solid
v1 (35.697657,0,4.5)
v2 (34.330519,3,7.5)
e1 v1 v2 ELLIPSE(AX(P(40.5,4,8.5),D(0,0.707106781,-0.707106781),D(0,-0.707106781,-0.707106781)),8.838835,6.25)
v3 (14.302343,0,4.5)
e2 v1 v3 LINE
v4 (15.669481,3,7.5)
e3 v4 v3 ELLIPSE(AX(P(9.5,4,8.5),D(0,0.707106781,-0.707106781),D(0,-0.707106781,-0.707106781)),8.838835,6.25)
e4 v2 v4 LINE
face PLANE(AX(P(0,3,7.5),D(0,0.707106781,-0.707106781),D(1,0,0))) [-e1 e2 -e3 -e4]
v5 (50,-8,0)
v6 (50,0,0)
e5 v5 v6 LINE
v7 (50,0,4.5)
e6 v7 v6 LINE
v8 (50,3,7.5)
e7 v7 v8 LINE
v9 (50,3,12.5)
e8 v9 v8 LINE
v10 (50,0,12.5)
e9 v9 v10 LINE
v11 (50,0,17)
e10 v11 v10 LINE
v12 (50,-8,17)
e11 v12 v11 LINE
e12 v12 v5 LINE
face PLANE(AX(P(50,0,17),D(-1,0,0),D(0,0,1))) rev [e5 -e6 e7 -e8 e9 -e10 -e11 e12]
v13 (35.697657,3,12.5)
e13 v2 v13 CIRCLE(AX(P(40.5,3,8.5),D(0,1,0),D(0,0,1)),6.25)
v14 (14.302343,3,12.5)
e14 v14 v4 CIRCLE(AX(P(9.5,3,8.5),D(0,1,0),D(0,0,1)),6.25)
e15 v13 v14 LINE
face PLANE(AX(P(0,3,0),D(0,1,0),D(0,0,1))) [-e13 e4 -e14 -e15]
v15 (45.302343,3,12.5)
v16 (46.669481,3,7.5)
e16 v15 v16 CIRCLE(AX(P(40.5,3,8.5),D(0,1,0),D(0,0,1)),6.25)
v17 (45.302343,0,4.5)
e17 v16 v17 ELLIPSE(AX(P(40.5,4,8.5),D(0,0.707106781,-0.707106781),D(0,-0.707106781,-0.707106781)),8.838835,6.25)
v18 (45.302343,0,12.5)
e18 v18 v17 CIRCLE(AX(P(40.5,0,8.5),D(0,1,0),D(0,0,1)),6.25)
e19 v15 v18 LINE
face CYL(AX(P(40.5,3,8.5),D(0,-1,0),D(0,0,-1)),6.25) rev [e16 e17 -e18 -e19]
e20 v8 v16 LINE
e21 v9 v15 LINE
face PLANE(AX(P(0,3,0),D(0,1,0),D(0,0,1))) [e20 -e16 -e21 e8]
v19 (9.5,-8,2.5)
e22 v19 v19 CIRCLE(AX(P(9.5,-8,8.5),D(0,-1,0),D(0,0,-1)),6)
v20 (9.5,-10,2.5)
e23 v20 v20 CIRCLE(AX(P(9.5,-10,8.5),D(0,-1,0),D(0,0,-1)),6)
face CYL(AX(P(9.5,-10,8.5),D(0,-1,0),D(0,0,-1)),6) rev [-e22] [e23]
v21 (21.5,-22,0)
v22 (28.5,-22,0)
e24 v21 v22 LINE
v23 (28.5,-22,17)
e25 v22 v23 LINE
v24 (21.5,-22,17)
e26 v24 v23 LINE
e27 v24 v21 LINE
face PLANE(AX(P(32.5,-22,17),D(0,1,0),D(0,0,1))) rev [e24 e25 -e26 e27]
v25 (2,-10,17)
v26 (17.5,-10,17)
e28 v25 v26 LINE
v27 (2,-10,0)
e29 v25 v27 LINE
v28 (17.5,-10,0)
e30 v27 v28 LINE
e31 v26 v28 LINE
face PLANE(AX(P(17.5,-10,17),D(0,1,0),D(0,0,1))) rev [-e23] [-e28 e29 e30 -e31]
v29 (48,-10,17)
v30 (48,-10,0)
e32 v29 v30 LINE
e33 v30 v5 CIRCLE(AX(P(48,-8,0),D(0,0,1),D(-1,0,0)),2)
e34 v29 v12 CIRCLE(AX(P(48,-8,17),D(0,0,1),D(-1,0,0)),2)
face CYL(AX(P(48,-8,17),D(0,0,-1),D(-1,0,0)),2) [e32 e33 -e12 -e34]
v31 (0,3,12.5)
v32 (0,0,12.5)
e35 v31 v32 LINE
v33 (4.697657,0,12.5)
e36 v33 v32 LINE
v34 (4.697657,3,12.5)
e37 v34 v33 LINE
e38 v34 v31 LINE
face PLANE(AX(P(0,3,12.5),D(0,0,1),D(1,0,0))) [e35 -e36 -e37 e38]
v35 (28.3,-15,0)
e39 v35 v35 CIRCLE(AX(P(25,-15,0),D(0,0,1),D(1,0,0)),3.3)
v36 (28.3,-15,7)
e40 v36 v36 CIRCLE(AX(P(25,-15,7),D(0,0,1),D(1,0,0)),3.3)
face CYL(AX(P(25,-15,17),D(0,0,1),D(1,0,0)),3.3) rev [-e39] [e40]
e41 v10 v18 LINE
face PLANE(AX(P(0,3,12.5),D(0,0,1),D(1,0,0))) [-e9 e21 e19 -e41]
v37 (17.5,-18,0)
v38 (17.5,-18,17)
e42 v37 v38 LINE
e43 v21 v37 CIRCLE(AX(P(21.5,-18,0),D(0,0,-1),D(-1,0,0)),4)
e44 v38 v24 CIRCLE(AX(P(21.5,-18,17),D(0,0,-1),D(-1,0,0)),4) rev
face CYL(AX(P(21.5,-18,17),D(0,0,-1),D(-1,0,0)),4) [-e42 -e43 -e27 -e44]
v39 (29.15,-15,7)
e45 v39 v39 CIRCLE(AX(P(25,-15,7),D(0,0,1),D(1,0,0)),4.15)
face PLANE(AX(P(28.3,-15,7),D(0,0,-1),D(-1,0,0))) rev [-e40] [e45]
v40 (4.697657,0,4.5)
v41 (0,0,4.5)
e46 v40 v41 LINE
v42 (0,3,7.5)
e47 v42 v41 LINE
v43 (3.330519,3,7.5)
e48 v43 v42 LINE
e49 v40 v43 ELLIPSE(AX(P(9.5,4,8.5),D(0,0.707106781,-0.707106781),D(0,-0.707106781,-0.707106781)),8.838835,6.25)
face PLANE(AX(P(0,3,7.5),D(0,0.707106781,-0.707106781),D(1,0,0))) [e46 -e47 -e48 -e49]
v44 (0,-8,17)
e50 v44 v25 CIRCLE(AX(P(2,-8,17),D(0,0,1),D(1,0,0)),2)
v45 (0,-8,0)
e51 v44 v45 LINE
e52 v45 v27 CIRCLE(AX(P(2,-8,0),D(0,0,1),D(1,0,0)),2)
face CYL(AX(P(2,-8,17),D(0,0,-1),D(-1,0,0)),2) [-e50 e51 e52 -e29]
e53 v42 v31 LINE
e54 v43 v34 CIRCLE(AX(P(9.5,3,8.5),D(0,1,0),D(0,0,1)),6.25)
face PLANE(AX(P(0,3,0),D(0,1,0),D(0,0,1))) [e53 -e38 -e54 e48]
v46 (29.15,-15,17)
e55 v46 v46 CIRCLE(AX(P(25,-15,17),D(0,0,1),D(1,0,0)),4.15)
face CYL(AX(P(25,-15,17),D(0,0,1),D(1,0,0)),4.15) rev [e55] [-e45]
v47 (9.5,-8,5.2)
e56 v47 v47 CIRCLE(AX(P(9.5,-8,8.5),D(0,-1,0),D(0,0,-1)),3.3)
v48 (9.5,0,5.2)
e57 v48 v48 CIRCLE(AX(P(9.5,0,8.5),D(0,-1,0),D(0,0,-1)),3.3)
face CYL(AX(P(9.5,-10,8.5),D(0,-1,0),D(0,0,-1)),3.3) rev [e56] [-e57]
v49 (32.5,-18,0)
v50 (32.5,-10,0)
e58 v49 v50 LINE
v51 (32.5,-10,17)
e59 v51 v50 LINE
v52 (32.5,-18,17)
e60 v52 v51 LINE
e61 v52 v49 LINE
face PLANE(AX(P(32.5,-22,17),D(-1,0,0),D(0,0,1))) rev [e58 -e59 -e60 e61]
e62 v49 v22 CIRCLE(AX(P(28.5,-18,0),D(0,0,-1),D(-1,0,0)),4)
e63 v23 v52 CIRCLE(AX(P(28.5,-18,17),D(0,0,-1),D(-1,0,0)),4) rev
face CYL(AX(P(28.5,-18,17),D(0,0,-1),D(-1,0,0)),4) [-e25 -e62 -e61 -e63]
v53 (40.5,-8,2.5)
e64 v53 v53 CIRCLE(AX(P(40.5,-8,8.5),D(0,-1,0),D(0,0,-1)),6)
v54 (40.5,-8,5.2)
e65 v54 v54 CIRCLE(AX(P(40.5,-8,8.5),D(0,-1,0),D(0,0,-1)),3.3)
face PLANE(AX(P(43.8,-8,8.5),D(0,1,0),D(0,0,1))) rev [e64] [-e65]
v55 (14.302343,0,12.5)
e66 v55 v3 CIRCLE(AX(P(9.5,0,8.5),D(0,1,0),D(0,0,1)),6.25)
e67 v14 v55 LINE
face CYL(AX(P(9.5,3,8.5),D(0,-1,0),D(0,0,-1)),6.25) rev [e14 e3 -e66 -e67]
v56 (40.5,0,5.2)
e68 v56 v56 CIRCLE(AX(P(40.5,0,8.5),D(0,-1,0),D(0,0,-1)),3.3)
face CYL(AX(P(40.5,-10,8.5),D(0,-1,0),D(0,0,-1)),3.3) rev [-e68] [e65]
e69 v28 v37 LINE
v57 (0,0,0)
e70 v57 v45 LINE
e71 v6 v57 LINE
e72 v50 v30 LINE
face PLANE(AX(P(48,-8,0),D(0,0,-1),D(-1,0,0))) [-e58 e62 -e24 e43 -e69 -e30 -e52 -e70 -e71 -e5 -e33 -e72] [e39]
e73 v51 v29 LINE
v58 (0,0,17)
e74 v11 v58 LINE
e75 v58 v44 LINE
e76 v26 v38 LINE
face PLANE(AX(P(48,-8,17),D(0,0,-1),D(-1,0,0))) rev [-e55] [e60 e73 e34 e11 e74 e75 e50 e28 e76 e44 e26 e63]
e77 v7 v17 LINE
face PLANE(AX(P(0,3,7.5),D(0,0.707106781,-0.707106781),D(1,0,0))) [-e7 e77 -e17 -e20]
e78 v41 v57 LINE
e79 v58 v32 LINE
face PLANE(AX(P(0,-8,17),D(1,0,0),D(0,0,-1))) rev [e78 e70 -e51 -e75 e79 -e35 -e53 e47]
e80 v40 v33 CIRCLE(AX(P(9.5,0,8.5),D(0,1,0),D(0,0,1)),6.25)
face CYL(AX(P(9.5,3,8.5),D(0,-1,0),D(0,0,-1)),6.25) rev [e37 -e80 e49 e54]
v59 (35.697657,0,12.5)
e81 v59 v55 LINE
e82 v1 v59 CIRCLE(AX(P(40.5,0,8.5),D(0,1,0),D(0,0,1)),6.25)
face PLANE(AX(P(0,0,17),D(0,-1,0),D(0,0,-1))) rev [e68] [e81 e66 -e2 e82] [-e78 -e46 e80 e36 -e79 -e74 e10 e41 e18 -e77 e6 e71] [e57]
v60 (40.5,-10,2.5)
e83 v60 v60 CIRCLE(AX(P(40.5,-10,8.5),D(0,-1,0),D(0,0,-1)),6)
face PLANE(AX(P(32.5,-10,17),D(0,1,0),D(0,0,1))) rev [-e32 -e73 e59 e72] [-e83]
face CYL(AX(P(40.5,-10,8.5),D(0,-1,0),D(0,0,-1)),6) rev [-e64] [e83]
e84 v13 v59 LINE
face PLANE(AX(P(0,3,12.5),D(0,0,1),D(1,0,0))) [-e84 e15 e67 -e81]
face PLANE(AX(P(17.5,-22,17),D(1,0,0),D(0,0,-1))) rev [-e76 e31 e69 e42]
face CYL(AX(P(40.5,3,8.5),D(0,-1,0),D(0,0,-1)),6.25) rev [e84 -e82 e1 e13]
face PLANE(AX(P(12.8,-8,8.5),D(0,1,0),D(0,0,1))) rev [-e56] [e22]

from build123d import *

# Parameters (mm, degrees)
P_IDAT_VYSUNUT_M1_DEPTH                           = 17
V_LCOV_ZAHLOUBEN_PRO_M6_ROUBY_S_HLAVO_D           = 6.6
V_LCOV_ZAHLOUBEN_PRO_M6_ROUBY_S_HLAVO_CBORE_D     = 8.3
V_LCOV_ZAHLOUBEN_PRO_M6_ROUBY_S_HLAVO_CBORE_DEPTH = 10
V_LCOV_ZAHLOUBEN_PRO_M6_ROUBY_S_H_2_D             = 6.6
V_LCOV_ZAHLOUBEN_PRO_M6_ROUBY_S_H_2_CBORE_D       = 12
V_LCOV_ZAHLOUBEN_PRO_M6_ROUBY_S_H_2_CBORE_DEPTH   = 2
ZAOBLIT1_R                                        = 4
P_IDAT_VYSUNUT_M4_DEPTH                           = 3
ZKOSEN_1_SIZE                                     = 3


with BuildPart() as part:
    # Skica1 → Přidat vysunutím1 (new body)
    with BuildSketch(Plane.XY):
        with BuildLine():
            Line((0, 0), (50, 0))
            Line((50, 0), (50, -8))
            ThreePointArc((50, -8), (49.414213562, -9.414213562), (48, -10))
            Line((48, -10), (32.5, -10))
            Line((32.5, -10), (32.5, -22))
            Line((32.5, -22), (17.5, -22))
            Line((17.5, -22), (17.5, -10))
            Line((17.5, -10), (2, -10))
            ThreePointArc((2, -10), (0.585786438, -9.414213562), (0, -8))
            Line((0, -8), (0, 0))
        make_face()
    extrude(amount=P_IDAT_VYSUNUT_M1_DEPTH)

    # V_lcov_ zahlouben_ pro M6 _rouby s hlavo (through all)
    with Locations(Plane.XY.offset(17)):
        with Locations((25, -15)):
            CounterBoreHole(V_LCOV_ZAHLOUBEN_PRO_M6_ROUBY_S_HLAVO_D / 2, V_LCOV_ZAHLOUBEN_PRO_M6_ROUBY_S_HLAVO_CBORE_D / 2, V_LCOV_ZAHLOUBEN_PRO_M6_ROUBY_S_HLAVO_CBORE_DEPTH)

    # V_lcov_ zahlouben_ pro M6 _rouby s h 2 (through all)
    with Locations(Plane(origin=(0, -10, 0), x_dir=(-1, 0, 0), z_dir=(0, -1, 0))):
        with Locations((-9.5, -8.5), (-40.5, -8.5)):
            CounterBoreHole(V_LCOV_ZAHLOUBEN_PRO_M6_ROUBY_S_H_2_D / 2, V_LCOV_ZAHLOUBEN_PRO_M6_ROUBY_S_H_2_CBORE_D / 2, V_LCOV_ZAHLOUBEN_PRO_M6_ROUBY_S_H_2_CBORE_DEPTH)

    # Zaoblit1
    zaoblit1_edges = [part.edges().sort_by_distance(p)[0] for p in [
        (32.5, -22, 8.5),
        (17.5, -22, 8.5),
    ]]
    fillet(zaoblit1_edges, radius=ZAOBLIT1_R)

    # Skica10 → Přidat vysunutím4 (add)
    with BuildSketch(Plane(origin=(0, 0, 0), x_dir=(1, 0, 0), z_dir=(0, 1, 0))):
        with BuildLine():
            Line((15.75, -8.5), (34.25, -8.5))
            ThreePointArc((34.25, -8.5), (34.623047352, -6.373047352), (35.697656822, -4.5))
            Line((35.697656822, -4.5), (14.302343178, -4.5))
            ThreePointArc((14.302343178, -4.5), (15.376952648, -6.373047352), (15.75, -8.5))
        make_face()
        with BuildLine():
            ThreePointArc((35.697656822, -12.5), (34.623047352, -10.626952648), (34.25, -8.5))
            Line((34.25, -8.5), (15.75, -8.5))
            ThreePointArc((15.75, -8.5), (15.376952648, -10.626952648), (14.302343178, -12.5))
            Line((14.302343178, -12.5), (35.697656822, -12.5))
        make_face()
        with BuildLine():
            ThreePointArc((4.697656822, -12.5), (3.623047352, -10.626952648), (3.25, -8.5))
            Line((3.25, -8.5), (0, -8.5))
            Line((0, -8.5), (0, -12.5))
            Line((0, -12.5), (4.697656822, -12.5))
        make_face()
        with BuildLine():
            Line((0, -8.5), (3.25, -8.5))
            ThreePointArc((3.25, -8.5), (3.623047352, -6.373047352), (4.697656822, -4.5))
            Line((4.697656822, -4.5), (0, -4.5))
            Line((0, -4.5), (0, -8.5))
        make_face()
        with BuildLine():
            Line((46.75, -8.5), (50, -8.5))
            Line((50, -8.5), (50, -4.5))
            Line((50, -4.5), (45.302343178, -4.5))
            ThreePointArc((45.302343178, -4.5), (46.376952648, -6.373047352), (46.75, -8.5))
        make_face()
        with BuildLine():
            Line((50, -12.5), (50, -8.5))
            Line((50, -8.5), (46.75, -8.5))
            ThreePointArc((46.75, -8.5), (46.376952648, -10.626952648), (45.302343178, -12.5))
            Line((45.302343178, -12.5), (50, -12.5))
        make_face()
    extrude(amount=P_IDAT_VYSUNUT_M4_DEPTH)

    # Zkosení1
    zkosen_1_edges = [part.edges().sort_by_distance(p)[0] for p in [
        (25, 3, 4.5),
        (2.348828411, 3, 4.5),
        (47.651171589, 3, 4.5),
    ]]
    chamfer(zkosen_1_edges, length=ZKOSEN_1_SIZE - 0.0001)  # a hair under: the kernel refuses the full size


solid = part.part
